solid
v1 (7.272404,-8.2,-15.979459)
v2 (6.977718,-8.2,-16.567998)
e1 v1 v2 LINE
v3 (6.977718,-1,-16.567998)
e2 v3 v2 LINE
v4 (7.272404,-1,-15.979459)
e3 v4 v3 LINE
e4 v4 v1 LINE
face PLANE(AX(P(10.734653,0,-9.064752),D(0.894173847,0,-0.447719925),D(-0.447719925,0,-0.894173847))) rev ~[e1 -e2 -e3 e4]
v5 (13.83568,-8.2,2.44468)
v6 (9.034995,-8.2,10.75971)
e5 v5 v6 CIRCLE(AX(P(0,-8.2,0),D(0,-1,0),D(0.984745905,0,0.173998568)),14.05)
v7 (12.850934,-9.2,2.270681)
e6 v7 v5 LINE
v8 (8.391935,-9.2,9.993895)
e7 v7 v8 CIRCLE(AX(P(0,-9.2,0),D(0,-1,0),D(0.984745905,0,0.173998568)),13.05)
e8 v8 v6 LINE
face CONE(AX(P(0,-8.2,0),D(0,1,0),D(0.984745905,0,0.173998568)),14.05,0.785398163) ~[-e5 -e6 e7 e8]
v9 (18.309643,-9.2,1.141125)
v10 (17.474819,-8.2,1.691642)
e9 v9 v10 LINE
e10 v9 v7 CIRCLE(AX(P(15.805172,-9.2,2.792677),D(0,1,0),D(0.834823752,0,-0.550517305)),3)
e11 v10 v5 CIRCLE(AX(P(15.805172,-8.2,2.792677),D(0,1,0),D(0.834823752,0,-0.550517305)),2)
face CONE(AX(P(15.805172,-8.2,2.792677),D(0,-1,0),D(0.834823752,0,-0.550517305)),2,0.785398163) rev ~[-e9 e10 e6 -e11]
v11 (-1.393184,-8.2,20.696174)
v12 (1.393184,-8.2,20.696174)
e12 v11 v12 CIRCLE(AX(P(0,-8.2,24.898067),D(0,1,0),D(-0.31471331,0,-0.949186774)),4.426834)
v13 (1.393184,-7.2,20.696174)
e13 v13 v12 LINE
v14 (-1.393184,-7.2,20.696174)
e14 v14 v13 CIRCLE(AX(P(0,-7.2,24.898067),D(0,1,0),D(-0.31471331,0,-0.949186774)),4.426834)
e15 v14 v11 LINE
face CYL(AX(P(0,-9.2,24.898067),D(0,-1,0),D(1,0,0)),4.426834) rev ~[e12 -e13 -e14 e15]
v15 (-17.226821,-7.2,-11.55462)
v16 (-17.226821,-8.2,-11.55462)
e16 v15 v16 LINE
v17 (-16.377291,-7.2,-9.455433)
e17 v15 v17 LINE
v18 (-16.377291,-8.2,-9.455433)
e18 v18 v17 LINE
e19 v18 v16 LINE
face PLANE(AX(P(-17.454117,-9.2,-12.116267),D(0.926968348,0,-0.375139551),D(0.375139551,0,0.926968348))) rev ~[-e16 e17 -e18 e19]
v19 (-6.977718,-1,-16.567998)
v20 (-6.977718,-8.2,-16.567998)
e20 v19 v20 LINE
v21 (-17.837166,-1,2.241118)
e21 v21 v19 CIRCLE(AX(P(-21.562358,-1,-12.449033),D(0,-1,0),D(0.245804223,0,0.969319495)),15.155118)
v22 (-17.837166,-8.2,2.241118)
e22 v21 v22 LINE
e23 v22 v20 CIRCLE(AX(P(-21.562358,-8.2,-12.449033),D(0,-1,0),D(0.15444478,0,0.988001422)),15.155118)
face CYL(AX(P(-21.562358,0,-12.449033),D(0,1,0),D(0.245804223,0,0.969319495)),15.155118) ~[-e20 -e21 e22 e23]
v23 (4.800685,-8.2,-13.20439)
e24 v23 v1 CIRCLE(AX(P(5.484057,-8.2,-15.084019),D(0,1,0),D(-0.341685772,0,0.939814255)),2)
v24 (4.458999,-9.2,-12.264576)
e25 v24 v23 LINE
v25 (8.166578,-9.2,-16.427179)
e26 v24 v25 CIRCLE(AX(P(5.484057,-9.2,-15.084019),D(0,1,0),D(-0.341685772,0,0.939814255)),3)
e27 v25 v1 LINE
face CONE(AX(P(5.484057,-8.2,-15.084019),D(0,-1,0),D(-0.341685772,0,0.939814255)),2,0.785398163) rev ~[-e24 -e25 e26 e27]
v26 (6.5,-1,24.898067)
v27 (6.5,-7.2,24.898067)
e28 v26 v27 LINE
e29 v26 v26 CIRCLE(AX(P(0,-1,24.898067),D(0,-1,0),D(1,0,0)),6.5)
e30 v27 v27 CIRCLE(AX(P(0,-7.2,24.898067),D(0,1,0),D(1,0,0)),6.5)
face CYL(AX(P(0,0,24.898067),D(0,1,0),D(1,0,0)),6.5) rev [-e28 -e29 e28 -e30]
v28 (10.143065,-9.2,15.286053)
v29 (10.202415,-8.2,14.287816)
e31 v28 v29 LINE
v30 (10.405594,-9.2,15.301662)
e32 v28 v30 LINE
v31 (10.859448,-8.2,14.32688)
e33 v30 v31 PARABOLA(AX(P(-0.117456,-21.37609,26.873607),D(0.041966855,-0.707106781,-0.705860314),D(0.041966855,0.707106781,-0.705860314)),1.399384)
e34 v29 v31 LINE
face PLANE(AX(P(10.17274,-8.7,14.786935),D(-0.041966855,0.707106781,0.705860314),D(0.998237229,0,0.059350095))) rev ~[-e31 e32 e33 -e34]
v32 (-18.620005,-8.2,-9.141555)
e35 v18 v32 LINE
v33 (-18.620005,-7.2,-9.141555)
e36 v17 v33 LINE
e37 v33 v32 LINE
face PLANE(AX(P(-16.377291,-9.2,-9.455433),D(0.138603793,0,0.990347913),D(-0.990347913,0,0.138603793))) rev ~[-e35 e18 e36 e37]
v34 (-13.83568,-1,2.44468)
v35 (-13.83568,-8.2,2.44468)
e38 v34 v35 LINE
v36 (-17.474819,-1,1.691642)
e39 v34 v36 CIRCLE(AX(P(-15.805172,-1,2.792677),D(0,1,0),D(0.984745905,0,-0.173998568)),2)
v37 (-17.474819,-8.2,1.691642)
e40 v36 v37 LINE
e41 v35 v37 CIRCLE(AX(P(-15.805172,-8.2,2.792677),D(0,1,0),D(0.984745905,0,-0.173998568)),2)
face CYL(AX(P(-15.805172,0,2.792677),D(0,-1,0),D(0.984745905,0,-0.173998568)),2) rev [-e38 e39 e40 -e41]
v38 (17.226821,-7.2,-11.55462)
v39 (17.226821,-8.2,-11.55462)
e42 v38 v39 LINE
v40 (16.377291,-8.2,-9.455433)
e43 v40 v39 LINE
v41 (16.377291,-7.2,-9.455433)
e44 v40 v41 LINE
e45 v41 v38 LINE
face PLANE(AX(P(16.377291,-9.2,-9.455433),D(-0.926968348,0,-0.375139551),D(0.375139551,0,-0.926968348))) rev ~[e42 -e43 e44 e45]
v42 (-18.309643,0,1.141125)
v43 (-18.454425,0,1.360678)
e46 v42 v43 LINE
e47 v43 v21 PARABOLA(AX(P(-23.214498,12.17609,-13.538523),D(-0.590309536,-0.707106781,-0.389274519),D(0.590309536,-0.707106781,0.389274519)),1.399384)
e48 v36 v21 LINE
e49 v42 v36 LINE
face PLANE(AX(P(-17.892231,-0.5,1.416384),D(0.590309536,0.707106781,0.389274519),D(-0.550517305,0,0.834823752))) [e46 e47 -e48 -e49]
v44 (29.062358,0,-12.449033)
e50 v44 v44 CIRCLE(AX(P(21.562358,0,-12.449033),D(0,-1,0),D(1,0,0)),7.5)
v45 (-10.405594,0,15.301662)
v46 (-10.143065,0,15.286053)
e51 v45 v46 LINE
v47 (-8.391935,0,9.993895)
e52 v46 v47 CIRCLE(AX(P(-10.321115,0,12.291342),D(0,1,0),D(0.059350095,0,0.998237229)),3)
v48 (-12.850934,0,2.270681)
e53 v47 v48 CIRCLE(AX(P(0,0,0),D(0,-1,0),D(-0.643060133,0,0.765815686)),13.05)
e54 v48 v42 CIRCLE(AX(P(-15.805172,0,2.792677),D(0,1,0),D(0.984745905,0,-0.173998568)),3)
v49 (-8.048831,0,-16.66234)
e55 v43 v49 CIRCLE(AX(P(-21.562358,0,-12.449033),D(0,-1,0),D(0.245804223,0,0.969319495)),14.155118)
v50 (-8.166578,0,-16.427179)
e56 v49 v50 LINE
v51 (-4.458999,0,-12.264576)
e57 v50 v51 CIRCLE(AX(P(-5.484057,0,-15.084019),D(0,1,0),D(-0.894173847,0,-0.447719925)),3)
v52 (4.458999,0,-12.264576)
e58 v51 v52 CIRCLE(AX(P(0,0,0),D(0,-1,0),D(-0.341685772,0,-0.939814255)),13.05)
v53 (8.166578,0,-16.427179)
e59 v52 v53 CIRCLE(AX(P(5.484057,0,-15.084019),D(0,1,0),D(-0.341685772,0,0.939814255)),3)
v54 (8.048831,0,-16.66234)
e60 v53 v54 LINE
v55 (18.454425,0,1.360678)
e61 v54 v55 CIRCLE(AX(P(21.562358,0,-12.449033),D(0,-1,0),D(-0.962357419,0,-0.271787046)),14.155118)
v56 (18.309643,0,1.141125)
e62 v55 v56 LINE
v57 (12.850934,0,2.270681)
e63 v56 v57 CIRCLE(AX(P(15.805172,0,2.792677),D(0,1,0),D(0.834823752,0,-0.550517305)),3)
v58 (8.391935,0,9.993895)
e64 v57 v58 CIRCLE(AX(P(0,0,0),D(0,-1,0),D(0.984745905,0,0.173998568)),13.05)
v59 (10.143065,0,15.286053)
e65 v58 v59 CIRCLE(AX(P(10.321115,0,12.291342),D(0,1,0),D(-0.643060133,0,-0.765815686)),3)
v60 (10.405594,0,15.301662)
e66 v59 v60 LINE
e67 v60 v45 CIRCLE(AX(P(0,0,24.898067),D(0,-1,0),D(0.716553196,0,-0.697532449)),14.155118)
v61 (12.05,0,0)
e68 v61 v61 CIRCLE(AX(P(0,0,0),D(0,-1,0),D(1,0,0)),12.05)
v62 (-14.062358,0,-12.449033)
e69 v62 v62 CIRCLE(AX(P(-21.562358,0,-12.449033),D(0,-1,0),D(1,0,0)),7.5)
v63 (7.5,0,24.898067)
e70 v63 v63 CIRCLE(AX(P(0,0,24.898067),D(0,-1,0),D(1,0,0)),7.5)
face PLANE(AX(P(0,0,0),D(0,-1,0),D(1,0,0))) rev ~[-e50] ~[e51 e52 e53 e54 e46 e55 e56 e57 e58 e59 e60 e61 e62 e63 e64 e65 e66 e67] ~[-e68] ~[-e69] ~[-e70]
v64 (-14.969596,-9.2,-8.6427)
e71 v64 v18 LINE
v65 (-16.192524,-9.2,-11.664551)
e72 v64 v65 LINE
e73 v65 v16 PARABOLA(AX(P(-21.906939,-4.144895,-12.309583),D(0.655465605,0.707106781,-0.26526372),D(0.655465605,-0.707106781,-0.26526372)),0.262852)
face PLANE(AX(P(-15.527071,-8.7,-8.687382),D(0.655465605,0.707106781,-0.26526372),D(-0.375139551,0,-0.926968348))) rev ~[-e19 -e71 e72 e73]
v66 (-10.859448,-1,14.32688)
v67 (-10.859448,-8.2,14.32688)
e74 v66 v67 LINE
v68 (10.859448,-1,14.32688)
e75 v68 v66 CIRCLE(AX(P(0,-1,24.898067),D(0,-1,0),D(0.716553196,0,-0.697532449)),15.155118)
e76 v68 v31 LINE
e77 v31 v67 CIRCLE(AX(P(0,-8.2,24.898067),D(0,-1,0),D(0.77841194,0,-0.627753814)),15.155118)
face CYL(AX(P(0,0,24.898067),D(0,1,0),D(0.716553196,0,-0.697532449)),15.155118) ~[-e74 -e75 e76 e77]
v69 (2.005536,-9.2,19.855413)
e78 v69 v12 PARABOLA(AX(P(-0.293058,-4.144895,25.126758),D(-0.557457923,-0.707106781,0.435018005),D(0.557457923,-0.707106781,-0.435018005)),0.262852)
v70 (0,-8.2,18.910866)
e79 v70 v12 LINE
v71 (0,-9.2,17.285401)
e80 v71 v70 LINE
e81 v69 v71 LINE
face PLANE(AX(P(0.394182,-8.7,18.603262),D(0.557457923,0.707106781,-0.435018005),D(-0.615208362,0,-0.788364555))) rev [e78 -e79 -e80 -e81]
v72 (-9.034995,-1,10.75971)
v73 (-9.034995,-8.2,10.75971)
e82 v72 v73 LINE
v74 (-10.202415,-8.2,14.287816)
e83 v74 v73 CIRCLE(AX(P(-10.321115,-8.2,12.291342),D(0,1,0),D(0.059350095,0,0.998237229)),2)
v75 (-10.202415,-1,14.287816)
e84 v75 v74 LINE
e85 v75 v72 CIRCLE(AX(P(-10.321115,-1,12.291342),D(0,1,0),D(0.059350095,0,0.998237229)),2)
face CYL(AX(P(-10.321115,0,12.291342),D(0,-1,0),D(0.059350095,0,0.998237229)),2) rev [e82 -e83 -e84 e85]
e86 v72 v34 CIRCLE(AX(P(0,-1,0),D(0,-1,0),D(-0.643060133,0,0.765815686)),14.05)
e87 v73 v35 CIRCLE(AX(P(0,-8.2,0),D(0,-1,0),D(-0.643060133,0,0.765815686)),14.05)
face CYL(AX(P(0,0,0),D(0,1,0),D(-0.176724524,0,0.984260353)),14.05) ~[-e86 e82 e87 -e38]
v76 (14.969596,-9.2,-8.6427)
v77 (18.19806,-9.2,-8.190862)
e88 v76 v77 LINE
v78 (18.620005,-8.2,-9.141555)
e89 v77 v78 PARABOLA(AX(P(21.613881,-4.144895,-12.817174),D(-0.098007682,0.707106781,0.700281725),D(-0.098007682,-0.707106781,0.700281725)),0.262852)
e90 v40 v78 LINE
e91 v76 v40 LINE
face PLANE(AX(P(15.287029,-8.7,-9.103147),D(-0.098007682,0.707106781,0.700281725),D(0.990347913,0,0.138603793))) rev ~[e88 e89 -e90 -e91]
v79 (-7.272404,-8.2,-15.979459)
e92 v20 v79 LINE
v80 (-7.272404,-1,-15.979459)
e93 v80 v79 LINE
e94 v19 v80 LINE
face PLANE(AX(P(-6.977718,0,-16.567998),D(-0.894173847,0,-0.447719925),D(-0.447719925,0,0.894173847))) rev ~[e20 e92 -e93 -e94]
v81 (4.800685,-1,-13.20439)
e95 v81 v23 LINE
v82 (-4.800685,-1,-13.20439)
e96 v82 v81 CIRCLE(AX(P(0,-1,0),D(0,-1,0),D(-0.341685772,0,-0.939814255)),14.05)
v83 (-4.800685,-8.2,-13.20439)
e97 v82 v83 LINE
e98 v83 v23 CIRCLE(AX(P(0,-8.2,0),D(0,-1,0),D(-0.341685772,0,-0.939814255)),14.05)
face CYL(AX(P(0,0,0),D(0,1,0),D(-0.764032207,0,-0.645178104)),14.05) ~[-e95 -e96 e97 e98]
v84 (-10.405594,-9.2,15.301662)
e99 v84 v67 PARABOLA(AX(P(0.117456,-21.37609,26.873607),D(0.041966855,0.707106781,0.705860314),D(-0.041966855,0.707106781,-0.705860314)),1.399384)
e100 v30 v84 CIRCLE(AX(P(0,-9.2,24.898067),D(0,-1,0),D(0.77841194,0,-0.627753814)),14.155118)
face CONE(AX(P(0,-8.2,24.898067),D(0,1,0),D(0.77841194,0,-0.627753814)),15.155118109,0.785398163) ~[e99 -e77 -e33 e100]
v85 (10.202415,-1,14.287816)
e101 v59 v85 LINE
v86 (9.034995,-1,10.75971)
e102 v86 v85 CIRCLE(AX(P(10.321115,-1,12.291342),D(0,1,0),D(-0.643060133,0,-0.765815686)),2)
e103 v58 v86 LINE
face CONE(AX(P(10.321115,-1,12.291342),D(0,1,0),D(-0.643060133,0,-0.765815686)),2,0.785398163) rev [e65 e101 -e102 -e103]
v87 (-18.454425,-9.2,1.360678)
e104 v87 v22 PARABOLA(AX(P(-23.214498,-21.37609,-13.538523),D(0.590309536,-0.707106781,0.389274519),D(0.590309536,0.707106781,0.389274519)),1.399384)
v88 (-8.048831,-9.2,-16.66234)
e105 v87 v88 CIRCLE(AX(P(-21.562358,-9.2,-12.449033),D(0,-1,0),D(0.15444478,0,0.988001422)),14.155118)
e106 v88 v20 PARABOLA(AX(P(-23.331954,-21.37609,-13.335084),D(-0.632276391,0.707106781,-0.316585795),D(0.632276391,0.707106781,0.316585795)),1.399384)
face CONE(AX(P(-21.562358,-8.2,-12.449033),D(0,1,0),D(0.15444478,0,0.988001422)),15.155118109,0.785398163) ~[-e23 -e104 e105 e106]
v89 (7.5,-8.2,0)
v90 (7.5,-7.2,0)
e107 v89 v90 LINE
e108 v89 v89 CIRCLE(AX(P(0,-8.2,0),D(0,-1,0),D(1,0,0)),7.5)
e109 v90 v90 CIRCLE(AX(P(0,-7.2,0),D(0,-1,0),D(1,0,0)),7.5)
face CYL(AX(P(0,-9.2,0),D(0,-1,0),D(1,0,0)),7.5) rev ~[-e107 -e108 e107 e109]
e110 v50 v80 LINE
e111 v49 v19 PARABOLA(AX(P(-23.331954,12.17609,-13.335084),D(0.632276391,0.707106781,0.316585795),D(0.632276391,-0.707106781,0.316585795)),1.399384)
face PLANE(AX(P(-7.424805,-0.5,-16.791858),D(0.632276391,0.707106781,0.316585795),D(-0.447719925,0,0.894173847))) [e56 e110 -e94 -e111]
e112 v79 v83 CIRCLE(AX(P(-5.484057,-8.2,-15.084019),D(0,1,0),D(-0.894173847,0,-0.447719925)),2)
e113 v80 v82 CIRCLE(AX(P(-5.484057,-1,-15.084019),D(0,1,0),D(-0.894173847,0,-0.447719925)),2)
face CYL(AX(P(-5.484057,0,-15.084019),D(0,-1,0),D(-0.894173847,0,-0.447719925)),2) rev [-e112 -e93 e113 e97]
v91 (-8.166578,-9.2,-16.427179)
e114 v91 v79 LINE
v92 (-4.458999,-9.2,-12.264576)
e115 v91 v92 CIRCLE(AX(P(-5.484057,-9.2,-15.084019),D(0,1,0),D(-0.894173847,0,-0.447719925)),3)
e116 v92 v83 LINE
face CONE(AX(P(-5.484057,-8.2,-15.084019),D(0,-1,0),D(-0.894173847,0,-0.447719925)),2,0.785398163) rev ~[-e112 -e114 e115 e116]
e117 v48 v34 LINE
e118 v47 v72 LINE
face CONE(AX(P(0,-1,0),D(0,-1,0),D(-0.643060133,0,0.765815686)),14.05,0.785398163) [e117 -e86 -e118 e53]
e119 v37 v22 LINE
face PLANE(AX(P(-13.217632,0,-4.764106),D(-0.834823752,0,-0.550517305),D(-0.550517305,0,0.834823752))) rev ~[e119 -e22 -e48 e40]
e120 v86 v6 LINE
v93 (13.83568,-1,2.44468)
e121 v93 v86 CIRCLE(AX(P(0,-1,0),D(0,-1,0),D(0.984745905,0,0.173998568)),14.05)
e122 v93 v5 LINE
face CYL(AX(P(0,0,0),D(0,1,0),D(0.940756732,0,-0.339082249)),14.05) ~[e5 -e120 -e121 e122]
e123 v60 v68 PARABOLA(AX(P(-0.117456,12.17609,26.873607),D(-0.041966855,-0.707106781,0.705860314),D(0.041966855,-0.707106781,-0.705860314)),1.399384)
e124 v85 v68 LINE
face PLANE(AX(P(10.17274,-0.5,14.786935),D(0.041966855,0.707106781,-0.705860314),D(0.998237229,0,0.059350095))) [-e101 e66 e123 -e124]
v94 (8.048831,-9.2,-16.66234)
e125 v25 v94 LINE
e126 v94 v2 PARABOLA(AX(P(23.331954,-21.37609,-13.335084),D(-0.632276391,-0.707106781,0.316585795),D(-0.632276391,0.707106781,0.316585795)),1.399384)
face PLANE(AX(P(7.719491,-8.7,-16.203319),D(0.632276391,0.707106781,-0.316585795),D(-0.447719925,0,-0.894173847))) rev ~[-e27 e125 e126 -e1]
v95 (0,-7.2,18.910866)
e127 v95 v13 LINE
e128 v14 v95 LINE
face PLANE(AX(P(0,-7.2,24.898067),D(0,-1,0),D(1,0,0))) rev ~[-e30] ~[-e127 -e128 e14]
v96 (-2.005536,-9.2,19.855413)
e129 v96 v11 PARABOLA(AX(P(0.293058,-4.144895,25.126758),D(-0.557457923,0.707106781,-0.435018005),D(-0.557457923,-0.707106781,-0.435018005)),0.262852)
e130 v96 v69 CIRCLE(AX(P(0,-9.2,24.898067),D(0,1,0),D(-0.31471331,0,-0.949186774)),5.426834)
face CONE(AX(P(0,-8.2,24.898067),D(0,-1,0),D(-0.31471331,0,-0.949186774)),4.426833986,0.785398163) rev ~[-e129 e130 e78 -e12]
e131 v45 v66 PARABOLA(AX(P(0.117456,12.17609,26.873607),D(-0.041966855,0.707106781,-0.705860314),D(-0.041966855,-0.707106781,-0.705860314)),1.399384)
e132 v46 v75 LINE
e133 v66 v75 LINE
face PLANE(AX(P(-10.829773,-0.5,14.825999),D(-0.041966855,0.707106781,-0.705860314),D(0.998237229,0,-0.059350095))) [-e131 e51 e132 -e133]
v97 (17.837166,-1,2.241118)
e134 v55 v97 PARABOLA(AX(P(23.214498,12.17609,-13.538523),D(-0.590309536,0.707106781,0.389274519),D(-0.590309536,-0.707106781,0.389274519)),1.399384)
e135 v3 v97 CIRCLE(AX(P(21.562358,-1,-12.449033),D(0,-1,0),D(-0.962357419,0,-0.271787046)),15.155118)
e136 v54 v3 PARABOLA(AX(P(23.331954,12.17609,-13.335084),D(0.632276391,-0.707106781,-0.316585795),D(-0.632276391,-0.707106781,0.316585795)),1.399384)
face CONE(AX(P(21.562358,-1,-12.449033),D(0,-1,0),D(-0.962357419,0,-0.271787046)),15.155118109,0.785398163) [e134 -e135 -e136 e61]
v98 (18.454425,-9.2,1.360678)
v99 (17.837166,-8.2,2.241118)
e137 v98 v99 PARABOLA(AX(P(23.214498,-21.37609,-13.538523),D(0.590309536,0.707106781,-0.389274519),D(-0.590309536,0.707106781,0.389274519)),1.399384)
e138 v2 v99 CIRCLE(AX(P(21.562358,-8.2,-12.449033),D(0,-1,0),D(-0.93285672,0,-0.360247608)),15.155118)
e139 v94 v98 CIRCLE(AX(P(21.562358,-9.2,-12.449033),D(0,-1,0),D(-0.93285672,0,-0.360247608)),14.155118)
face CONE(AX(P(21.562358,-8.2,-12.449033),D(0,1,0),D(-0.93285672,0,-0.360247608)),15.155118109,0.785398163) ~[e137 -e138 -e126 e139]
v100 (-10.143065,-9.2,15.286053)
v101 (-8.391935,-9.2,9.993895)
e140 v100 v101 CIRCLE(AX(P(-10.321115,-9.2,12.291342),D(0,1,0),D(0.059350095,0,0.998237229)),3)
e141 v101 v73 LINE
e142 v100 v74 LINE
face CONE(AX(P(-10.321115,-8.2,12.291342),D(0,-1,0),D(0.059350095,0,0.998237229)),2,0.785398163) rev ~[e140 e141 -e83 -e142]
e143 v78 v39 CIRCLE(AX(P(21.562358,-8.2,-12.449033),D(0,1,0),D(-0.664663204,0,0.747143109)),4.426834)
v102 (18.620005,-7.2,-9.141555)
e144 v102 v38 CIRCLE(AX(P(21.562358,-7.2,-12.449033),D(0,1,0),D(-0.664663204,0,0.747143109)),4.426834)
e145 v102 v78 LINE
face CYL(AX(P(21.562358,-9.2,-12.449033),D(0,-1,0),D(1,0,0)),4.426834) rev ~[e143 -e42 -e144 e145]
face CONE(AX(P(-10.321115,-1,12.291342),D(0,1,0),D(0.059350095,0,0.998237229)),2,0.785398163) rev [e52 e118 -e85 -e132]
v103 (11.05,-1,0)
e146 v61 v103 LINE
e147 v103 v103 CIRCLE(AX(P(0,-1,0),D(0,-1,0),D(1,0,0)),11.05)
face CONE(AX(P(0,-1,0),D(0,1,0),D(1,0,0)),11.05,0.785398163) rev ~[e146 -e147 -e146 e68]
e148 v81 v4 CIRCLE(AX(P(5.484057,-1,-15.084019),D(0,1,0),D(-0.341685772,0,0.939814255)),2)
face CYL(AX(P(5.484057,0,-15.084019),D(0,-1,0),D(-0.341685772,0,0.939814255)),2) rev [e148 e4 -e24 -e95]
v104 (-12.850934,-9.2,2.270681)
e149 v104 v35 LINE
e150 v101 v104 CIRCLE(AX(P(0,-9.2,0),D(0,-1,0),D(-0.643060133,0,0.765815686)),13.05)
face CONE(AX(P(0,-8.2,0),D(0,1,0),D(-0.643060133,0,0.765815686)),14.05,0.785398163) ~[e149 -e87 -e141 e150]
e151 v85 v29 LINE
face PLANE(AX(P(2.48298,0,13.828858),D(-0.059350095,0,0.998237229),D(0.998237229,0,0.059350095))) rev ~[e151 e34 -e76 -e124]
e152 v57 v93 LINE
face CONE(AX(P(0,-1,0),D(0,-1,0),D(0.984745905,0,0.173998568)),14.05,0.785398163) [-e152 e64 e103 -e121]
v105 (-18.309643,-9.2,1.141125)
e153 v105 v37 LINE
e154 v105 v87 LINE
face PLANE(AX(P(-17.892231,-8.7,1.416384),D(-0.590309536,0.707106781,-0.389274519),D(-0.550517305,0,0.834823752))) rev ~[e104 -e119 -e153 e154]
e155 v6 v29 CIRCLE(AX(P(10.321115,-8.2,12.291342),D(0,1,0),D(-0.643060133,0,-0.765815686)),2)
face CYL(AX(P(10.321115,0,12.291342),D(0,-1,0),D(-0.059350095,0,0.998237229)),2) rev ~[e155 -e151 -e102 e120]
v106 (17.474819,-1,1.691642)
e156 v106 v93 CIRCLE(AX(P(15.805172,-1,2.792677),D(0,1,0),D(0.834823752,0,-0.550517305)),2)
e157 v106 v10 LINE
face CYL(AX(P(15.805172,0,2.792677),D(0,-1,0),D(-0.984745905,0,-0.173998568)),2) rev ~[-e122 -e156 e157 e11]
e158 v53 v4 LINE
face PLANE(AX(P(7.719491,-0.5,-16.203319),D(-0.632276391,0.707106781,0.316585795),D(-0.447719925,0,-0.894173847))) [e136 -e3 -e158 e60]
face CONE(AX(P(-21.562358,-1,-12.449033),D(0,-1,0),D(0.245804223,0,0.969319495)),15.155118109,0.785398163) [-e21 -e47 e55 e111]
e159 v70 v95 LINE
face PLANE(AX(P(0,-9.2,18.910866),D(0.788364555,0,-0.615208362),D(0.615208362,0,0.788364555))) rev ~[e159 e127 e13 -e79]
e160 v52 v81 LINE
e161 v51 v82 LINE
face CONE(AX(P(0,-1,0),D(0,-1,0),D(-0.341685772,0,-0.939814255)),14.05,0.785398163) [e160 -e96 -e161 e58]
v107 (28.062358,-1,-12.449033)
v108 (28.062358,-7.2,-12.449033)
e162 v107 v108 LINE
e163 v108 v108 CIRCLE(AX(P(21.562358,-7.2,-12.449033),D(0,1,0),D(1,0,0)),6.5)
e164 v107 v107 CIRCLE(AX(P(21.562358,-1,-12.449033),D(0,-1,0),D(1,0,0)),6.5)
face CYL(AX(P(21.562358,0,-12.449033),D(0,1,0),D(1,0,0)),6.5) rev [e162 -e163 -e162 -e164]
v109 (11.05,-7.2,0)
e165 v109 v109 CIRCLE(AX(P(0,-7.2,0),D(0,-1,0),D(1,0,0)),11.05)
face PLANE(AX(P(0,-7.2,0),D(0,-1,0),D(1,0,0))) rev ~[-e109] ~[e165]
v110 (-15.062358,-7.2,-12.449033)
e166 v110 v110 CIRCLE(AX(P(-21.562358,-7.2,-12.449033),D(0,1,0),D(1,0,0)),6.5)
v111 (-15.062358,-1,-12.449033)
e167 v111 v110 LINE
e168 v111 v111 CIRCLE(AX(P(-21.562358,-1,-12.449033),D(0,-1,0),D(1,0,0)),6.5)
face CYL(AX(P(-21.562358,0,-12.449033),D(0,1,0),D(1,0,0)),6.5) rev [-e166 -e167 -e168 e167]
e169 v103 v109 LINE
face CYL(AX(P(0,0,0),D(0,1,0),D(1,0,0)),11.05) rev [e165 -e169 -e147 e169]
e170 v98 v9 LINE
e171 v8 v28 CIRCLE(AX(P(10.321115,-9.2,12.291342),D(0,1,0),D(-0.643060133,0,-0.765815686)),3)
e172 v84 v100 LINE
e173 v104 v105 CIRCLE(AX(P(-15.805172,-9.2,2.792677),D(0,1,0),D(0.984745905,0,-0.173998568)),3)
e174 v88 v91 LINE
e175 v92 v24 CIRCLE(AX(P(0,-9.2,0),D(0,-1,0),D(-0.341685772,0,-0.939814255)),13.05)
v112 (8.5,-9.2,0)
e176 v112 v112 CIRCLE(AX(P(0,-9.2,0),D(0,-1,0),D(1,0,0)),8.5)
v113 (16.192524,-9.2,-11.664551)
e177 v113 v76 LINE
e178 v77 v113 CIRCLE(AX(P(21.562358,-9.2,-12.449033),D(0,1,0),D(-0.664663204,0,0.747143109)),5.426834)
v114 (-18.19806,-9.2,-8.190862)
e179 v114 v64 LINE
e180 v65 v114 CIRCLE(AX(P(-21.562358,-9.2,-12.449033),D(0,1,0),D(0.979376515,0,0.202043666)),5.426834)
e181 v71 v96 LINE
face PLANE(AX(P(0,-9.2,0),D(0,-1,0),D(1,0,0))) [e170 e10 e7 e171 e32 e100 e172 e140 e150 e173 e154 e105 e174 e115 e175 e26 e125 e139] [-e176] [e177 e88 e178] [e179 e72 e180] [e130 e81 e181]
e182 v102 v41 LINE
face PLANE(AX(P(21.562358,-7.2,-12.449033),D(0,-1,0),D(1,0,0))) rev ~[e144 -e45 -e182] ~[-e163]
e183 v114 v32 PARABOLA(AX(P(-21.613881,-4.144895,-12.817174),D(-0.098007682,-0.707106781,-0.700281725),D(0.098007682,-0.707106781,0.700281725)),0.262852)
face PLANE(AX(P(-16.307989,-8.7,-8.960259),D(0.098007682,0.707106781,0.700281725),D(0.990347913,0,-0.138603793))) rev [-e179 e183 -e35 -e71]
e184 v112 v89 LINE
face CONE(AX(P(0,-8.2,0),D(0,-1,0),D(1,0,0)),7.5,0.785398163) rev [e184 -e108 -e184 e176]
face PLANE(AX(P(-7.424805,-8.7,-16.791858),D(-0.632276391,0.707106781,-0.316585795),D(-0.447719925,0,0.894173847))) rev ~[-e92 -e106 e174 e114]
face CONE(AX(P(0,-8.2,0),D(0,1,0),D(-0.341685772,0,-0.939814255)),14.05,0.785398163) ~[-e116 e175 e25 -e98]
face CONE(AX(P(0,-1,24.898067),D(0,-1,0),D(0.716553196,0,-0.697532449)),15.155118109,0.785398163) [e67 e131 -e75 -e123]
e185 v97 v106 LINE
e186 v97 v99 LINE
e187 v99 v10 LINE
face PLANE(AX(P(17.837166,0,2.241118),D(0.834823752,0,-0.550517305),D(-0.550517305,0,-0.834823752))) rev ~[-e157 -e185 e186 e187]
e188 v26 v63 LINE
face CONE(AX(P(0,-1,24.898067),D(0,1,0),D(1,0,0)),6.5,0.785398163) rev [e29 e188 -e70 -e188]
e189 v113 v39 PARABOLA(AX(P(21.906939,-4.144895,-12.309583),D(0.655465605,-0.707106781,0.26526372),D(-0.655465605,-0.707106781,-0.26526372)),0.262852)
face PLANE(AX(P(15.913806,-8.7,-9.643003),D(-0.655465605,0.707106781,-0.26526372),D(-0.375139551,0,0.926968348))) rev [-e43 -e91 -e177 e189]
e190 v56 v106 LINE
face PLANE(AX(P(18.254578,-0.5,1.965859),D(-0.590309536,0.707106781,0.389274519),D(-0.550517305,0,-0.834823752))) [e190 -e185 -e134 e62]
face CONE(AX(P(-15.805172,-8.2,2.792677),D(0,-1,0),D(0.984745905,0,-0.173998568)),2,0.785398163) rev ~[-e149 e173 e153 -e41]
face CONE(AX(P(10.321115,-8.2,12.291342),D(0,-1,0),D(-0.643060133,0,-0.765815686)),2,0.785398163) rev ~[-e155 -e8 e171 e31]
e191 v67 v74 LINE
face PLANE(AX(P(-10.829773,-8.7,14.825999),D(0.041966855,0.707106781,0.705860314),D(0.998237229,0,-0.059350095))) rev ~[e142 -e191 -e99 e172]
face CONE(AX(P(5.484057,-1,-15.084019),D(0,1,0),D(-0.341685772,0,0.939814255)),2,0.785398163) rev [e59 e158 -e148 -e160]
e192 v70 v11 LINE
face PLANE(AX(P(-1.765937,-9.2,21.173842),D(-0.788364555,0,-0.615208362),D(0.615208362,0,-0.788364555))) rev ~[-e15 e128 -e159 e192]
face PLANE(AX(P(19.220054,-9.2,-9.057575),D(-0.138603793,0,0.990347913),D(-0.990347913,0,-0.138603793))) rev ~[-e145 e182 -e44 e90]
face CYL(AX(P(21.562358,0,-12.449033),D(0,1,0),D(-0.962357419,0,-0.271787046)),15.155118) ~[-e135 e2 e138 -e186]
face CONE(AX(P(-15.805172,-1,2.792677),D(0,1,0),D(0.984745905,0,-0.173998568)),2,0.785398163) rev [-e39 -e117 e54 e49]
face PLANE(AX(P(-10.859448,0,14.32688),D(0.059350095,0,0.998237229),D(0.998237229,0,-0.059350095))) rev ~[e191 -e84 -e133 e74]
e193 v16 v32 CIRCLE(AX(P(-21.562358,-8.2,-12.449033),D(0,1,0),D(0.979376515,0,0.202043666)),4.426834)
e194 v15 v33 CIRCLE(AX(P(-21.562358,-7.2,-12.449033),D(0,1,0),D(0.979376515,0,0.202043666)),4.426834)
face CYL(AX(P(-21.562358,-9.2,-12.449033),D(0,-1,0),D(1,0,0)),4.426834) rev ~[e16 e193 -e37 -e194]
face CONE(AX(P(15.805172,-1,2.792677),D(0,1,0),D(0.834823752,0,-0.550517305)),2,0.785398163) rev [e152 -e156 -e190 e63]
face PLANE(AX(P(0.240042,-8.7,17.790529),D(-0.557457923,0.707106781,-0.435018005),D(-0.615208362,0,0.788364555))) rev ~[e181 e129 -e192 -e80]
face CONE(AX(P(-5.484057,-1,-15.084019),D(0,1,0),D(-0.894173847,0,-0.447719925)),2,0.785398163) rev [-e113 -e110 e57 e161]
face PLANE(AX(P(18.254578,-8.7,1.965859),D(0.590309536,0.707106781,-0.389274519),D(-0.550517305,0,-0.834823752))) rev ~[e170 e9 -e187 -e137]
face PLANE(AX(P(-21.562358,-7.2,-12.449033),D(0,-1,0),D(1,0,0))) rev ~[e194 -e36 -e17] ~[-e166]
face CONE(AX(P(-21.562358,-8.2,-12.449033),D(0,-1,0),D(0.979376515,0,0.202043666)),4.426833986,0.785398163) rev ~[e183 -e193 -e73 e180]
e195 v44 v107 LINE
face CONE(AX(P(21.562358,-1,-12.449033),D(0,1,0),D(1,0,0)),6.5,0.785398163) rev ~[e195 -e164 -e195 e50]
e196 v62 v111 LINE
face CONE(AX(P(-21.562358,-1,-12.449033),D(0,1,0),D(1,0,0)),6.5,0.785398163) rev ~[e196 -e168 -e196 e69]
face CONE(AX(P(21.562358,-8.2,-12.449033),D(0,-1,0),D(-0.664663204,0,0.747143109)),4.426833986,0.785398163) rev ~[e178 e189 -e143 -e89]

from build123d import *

# Parameters (mm, degrees)
F0_R        = 6.5
F0_R_2      = 11.05
F1_DEPTH    = 9.2
F2_R        = 7.5
F2_R_2      = 4.4268339864
F2_R_3      = 11.05
F3_DEPTH    = 2
F4_R        = 2
F6_DEPTH    = 25
F7_SIZE     = 1
F8_C1_SIZE  = 1
F8_C2_SIZE  = 1
F8_C3_SIZE  = 1
F8_C4_SIZE  = 1
F8_C5_SIZE  = 1
F8_C6_SIZE  = 1
F8_C7_SIZE  = 1
F8_C8_SIZE  = 1
F8_C9_SIZE  = 1
F8_C10_SIZE = 1
F8_C11_SIZE = 1
F8_C12_SIZE = 1
F8_C13_SIZE = 1
F8_C14_SIZE = 1
F8_C15_SIZE = 1
F8_C16_SIZE = 1


with BuildPart() as f1:
    # F0 (on Front) → F1 (new body)
    with BuildSketch(Plane.XZ):
        with BuildLine():
            Line((-10.8594483096, 14.3268800737), (-2.4829795671, 13.8288579597))
            ThreePointArc((-2.4829795671, 13.8288579597), (-12.1676569232, 7.025), (-13.217632082, -4.7641055977))
            Line((-13.217632082, -4.7641055977), (-17.8371662556, 2.2411180703))
            ThreePointArc((-17.8371662556, 2.2411180703), (-34.6870755728, -20.0265924193), (-6.977717946, -16.5679981441))
            Line((-6.977717946, -16.5679981441), (-10.7346525149, -9.064752362))
            ThreePointArc((-10.7346525149, -9.064752362), (0, -14.05), (10.7346525149, -9.064752362))
            Line((10.7346525149, -9.064752362), (6.977717946, -16.5679981441))
            ThreePointArc((6.977717946, -16.5679981441), (34.6870755728, -20.0265924193), (17.8371662556, 2.2411180703))
            Line((17.8371662556, 2.2411180703), (13.217632082, -4.7641055977))
            ThreePointArc((13.217632082, -4.7641055977), (12.1676569232, 7.025), (2.4829795671, 13.8288579597))
            Line((2.4829795671, 13.8288579597), (10.8594483096, 14.3268800737))
            ThreePointArc((10.8594483096, 14.3268800737), (0, 40.0531848387), (-10.8594483096, 14.3268800737))
        make_face()
        with Locations((-21.5623582929, -12.4490333648)):
            Circle(F0_R, mode=Mode.SUBTRACT)
        with Locations((21.5623582929, -12.4490333648)):
            Circle(F0_R, mode=Mode.SUBTRACT)
        Circle(F0_R_2, mode=Mode.SUBTRACT)
        with Locations((0, 24.8980667296)):
            Circle(F0_R, mode=Mode.SUBTRACT)
    extrude(amount=F1_DEPTH)

    # F2 (on face) → F3 (join)
    with BuildSketch(Plane.XZ.offset(9.2)):
        with Locations((0, 24.8980667296)):
            Circle(F2_R)
        with Locations((0, 24.8980667296)):
            Circle(F2_R_2, mode=Mode.SUBTRACT)
        with Locations((-21.5623582929, -12.4490333648)):
            Circle(F2_R)
        with Locations((-21.5623582929, -12.4490333648)):
            Circle(F2_R_2, mode=Mode.SUBTRACT)
        with Locations((21.5623582929, -12.4490333648)):
            Circle(F2_R)
        with Locations((21.5623582929, -12.4490333648)):
            Circle(F2_R_2, mode=Mode.SUBTRACT)
        Circle(F2_R_3)
        Circle(F2_R, mode=Mode.SUBTRACT)
    extrude(amount=-F3_DEPTH)

    # F4
    f4_edges = [f1.edges().sort_by_distance(p)[0] for p in [
        (2.48298, -4.6, 13.828858),
        (-2.48298, -4.6, 13.828858),
        (-13.217632, -4.6, -4.764106),
        (-10.734653, -4.6, -9.064752),
        (10.734653, -4.6, -9.064752),
        (13.217632, -4.6, -4.764106),
    ]]
    fillet(f4_edges, radius=F4_R)

    # F5 (on face) → F6 (cut)
    with BuildSketch(Plane.XZ.offset(9.2)):
        with BuildLine():
            Line((0, 18.9108662307), (1.7659365324, 21.1738422452))
            ThreePointArc((1.7659365324, 21.1738422452), (0, 24.9152206672), (-1.7659365324, 21.1738422452))
            Line((-1.7659365324, 21.1738422452), (0, 18.9108662307))
        make_face()
        with BuildLine():
            Line((-16.3772905634, -9.4554331154), (-19.2200535463, -9.057575224))
            ThreePointArc((-19.2200535463, -9.057575224), (-21.5772140387, -12.4576103336), (-17.4541170138, -12.1162670212))
            Line((-17.4541170138, -12.1162670212), (-16.3772905634, -9.4554331154))
        make_face()
        with BuildLine():
            Line((16.3772905634, -9.4554331154), (17.4541170138, -12.1162670212))
            ThreePointArc((17.4541170138, -12.1162670212), (21.5772140387, -12.4576103336), (19.2200535463, -9.057575224))
            Line((19.2200535463, -9.057575224), (16.3772905634, -9.4554331154))
        make_face()
    extrude(amount=-F6_DEPTH, mode=Mode.SUBTRACT)

    # F7
    f7_edges = [f1.edges().sort_by_distance(p)[0] for p in [
        (10.530932, 0, 14.307348),
        (8.422362, 0, 12.919623),
        (0, 0, 40.053185),
        (12.167657, 0, 7.025),
        (-10.530932, 0, 14.307348),
        (15.399903, 0, 0.834168),
        (-8.422362, 0, 12.919623),
        (17.655993, 0, 1.96638),
        (-12.167657, 0, 7.025),
        (34.687076, 0, -20.026592),
        (-15.399903, 0, 0.834168),
        (7.125061, 0, -16.273728),
        (-17.655993, 0, 1.96638),
        (6.977541, 0, -13.753791),
        (-34.687076, 0, -20.026592),
        (0, 0, -14.05),
        (-7.125061, 0, -16.273728),
        (-6.977541, 0, -13.753791),
        (-28.062358, 0, -12.449033),
        (15.062358, 0, -12.449033),
        (-11.05, 0, 0),
        (-6.5, 0, 24.898067),
    ]]
    chamfer(f7_edges, length=F7_SIZE)

    # F8: chamfer of 1 on 28 edges, made by hand

    # F8_c1
    f8_c1_edges = [f1.edges().sort_by_distance(p)[0] for p in [
        (10.5309316289, -9.2, 14.3073481472),
        (8.4223621743, -9.2, 12.9196228952),
        (17.6559927707, -9.2, 1.9663802425),
        (15.3999027217, -9.2, 0.8341681552),
        (12.1676569232, -9.2, 7.025),
    ]]
    chamfer(f8_c1_edges, length=F8_C1_SIZE)

    # F8_c2
    f8_c2_edges = [f1.edges().sort_by_distance(p)[0] for p in [
        (-10.5309316289, -9.2, 14.3073481472),
        (-8.4223621743, -9.2, 12.9196228952),
        (-12.1676569232, -9.2, 7.025),
        (-15.3999027217, -9.2, 0.8341681552),
        (-17.6559927707, -9.2, 1.9663802425),
    ]]
    chamfer(f8_c2_edges, length=F8_C2_SIZE)

    # F8_c3
    f8_c3_edges = [f1.edges().sort_by_distance(p)[0] for p in [
        (-7.1250611419, -9.2, -16.2737283897),
        (-6.9775405475, -9.2, -13.7537910504),
        (0, -9.2, -14.05),
        (6.9775405475, -9.2, -13.7537910504),
        (7.1250611419, -9.2, -16.2737283897),
    ]]
    chamfer(f8_c3_edges, length=F8_C3_SIZE)

    # F8_c4
    f8_c4_edges = [f1.edges().sort_by_distance(p)[0] for p in [
        (34.6870755728, -9.2, -20.0265924193),
    ]]
    chamfer(f8_c4_edges, length=F8_C4_SIZE)

    # F8_c5
    f8_c5_edges = [f1.edges().sort_by_distance(p)[0] for p in [
        (-25.3961089835, -9.2, -14.662450358),
    ]]
    chamfer(f8_c5_edges, length=F8_C5_SIZE)

    # F8_c6
    f8_c6_edges = [f1.edges().sort_by_distance(p)[0] for p in [
        (-16.7411021229, -9.2, -9.4045159968),
    ]]
    chamfer(f8_c6_edges, length=F8_C6_SIZE)

    # F8_c7
    f8_c7_edges = [f1.edges().sort_by_distance(p)[0] for p in [
        (-16.515100825, -9.2, -9.7959617274),
    ]]
    chamfer(f8_c7_edges, length=F8_C7_SIZE)

    # F8_c8
    f8_c8_edges = [f1.edges().sort_by_distance(p)[0] for p in [
        (25.3961089835, -9.2, -14.662450358),
    ]]
    chamfer(f8_c8_edges, length=F8_C8_SIZE)

    # F8_c9
    f8_c9_edges = [f1.edges().sort_by_distance(p)[0] for p in [
        (16.515100825, -9.2, -9.7959617274),
    ]]
    chamfer(f8_c9_edges, length=F8_C9_SIZE)

    # F8_c10
    f8_c10_edges = [f1.edges().sort_by_distance(p)[0] for p in [
        (16.7411021229, -9.2, -9.4045159968),
    ]]
    chamfer(f8_c10_edges, length=F8_C10_SIZE)

    # F8_c11
    f8_c11_edges = [f1.edges().sort_by_distance(p)[0] for p in [
        (-7.5, -9.2, 0),
    ]]
    chamfer(f8_c11_edges, length=F8_C11_SIZE)

    # F8_c12
    f8_c12_edges = [f1.edges().sort_by_distance(p)[0] for p in [
        (0, -9.2, 29.324900716),
    ]]
    chamfer(f8_c12_edges, length=F8_C12_SIZE)

    # F8_c13
    f8_c13_edges = [f1.edges().sort_by_distance(p)[0] for p in [
        (0.226001298, -9.2, 19.2004777242),
    ]]
    chamfer(f8_c13_edges, length=F8_C13_SIZE)

    # F8_c14
    f8_c14_edges = [f1.edges().sort_by_distance(p)[0] for p in [
        (-0.226001298, -9.2, 19.2004777242),
    ]]
    chamfer(f8_c14_edges, length=F8_C14_SIZE)

    # F8_c15
    f8_c15_edges = [f1.edges().sort_by_distance(p)[0] for p in [
        (0, -9.2, 40.0531848387),
    ]]
    chamfer(f8_c15_edges, length=F8_C15_SIZE)

    # F8_c16
    f8_c16_edges = [f1.edges().sort_by_distance(p)[0] for p in [
        (-34.6870755728, -9.2, -20.0265924193),
    ]]
    chamfer(f8_c16_edges, length=F8_C16_SIZE)


solid = f1.part
